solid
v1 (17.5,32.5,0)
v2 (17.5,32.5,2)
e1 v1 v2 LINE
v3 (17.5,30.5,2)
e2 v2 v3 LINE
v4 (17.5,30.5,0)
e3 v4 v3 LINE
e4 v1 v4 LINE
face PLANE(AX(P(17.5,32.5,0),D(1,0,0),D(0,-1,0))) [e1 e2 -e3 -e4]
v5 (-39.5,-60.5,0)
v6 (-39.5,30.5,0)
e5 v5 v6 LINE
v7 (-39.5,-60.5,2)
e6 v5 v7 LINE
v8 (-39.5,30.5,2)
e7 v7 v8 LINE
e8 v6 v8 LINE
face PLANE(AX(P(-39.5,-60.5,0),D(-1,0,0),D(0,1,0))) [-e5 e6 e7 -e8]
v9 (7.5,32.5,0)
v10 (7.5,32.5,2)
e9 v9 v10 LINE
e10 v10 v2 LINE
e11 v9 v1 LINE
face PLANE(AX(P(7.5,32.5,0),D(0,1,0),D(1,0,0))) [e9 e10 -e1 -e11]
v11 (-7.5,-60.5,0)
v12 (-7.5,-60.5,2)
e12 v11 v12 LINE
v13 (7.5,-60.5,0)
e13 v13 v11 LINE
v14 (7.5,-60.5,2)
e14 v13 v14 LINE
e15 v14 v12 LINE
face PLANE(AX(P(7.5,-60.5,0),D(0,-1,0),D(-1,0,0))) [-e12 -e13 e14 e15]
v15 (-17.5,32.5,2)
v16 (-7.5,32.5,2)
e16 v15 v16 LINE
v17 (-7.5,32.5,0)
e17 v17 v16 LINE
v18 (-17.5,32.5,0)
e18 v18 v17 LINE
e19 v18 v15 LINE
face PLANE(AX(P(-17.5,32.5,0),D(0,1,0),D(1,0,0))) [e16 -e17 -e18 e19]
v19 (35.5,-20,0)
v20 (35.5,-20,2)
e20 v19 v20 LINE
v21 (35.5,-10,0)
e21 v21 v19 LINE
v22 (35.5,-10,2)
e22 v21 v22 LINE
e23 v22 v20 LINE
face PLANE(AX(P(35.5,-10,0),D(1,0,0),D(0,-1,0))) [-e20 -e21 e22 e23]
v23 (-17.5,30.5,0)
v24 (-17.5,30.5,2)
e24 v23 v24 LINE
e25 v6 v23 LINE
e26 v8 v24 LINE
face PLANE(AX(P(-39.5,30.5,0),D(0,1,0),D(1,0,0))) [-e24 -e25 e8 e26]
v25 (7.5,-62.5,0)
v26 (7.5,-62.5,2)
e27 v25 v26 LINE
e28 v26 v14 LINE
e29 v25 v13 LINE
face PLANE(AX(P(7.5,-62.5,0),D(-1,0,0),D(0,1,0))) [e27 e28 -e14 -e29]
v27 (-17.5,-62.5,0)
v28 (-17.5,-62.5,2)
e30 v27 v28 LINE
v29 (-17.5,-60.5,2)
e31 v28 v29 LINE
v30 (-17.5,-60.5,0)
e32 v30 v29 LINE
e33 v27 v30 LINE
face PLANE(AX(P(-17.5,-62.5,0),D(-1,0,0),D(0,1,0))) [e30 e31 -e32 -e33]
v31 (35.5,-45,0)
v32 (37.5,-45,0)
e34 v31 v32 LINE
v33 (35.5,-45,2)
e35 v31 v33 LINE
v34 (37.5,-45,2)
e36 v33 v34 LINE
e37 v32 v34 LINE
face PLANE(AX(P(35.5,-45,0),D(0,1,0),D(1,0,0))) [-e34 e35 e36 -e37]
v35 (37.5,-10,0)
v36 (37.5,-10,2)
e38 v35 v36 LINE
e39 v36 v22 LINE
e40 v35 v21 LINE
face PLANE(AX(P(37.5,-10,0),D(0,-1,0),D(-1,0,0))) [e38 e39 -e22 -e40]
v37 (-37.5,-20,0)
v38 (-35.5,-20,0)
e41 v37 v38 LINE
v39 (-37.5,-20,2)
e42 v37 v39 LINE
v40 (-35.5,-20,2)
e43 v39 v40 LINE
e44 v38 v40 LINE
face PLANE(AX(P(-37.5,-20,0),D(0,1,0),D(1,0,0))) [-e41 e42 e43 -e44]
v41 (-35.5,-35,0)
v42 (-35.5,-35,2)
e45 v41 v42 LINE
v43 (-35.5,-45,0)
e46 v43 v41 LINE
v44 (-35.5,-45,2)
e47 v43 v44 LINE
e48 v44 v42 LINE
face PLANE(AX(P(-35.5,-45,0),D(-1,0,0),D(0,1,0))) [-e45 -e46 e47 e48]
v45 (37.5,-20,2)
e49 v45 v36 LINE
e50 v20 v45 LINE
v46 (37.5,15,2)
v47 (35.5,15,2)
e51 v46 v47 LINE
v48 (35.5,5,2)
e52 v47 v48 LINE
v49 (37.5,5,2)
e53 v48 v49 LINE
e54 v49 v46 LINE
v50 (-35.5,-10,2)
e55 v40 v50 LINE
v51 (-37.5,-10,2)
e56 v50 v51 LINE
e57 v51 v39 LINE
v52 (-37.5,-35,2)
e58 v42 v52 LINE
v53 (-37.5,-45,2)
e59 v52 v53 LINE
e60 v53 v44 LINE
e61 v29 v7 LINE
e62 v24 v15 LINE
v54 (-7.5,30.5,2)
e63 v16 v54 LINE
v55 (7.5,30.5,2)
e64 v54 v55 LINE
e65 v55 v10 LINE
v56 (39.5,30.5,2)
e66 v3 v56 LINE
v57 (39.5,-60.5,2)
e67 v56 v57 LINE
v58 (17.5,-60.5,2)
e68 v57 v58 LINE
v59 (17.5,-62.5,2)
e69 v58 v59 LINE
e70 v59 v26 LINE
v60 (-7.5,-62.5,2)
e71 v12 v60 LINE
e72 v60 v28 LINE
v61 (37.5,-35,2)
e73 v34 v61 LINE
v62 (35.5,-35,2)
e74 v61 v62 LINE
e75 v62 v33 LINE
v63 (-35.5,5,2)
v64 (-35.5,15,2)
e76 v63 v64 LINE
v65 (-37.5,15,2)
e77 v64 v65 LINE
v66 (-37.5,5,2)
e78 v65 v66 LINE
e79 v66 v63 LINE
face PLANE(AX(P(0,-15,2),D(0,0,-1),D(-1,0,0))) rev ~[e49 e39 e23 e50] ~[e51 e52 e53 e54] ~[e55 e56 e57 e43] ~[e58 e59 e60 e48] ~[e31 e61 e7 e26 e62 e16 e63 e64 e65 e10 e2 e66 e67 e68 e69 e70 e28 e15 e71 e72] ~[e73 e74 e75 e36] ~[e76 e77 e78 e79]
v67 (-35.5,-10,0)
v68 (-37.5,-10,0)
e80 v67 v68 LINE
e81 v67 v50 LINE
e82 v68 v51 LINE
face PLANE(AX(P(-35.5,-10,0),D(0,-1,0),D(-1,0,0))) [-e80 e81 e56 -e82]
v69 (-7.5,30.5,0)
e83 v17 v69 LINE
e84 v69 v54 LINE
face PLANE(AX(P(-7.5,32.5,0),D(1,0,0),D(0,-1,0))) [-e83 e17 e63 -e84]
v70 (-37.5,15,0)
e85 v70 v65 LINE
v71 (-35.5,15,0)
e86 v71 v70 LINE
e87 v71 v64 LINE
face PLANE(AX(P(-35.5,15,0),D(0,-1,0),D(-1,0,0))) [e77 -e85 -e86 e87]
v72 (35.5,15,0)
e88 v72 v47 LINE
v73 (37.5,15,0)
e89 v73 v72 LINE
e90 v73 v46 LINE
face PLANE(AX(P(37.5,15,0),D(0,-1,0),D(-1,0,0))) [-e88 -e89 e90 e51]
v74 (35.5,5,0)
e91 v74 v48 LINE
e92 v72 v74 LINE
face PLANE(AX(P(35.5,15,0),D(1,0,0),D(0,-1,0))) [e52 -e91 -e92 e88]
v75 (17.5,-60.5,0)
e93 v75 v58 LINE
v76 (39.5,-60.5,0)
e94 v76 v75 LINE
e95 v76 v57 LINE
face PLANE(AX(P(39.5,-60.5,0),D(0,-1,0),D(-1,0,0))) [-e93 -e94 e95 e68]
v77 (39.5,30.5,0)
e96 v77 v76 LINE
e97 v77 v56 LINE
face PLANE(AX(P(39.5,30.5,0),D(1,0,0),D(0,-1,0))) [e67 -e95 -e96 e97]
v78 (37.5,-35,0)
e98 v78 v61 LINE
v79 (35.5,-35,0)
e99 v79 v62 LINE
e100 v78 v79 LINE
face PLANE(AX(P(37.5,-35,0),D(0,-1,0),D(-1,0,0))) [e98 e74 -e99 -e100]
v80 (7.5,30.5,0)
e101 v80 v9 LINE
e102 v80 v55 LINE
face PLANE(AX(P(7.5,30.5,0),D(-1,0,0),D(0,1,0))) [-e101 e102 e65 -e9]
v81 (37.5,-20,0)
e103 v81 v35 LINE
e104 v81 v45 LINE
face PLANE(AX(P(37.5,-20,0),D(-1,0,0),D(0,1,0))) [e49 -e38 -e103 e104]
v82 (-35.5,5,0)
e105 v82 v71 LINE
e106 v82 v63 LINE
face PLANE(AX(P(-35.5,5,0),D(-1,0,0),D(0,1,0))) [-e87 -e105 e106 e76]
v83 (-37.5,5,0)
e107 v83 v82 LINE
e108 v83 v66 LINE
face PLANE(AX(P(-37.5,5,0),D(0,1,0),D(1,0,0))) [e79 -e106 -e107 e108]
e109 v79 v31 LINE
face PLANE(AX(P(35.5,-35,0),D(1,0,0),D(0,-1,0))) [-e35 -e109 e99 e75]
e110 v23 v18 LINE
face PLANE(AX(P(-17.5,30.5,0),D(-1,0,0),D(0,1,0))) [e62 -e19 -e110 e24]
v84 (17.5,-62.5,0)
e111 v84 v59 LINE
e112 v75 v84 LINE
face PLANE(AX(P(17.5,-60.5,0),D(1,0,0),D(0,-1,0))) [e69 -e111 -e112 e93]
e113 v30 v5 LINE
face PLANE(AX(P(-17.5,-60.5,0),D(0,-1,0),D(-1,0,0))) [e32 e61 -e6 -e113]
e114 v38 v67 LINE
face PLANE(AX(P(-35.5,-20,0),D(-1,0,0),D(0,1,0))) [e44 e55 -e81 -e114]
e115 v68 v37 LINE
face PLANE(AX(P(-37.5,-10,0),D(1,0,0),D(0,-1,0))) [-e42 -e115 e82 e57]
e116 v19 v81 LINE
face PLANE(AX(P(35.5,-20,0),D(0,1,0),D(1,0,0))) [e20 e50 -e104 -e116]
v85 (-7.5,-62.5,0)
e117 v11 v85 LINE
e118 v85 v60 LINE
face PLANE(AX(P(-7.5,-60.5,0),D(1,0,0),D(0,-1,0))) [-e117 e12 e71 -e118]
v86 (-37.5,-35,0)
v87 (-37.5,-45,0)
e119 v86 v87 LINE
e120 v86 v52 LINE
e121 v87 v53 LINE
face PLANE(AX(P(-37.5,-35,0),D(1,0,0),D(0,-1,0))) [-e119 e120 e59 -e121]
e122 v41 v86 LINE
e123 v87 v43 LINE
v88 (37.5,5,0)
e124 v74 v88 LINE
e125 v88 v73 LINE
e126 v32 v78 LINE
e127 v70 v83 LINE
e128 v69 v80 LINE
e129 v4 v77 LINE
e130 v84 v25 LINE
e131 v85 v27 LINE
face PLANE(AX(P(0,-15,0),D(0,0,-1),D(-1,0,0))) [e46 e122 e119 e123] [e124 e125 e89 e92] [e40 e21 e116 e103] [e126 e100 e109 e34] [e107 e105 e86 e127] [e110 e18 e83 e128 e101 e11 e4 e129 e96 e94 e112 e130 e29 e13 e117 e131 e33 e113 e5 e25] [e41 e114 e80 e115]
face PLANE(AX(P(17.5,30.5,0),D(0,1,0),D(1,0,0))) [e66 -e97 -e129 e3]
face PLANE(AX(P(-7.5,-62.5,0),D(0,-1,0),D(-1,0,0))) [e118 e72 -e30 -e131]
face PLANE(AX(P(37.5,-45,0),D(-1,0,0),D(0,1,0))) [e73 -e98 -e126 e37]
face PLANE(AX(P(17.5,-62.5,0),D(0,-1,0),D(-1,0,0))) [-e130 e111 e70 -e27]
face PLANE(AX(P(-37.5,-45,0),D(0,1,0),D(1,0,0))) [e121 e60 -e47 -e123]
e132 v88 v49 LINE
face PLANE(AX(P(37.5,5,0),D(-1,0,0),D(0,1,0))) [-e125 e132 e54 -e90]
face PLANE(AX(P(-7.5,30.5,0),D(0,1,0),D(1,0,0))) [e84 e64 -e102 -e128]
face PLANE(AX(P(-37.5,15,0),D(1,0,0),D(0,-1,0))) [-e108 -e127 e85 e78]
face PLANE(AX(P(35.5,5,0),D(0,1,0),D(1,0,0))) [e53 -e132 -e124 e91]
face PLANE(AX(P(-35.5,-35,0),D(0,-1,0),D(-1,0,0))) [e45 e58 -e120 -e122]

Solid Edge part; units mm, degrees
sketch "Sketch1" plane through (0, 0, 0) normal (0, 0, 1) x (1, 0, 0)
  line L0 (7.5, -60.5) -> (-7.5, -60.5)
  line L1 (-7.5, -60.5) -> (-7.5, -62.5)
  line L2 (-7.5, -62.5) -> (-17.5, -62.5)
  line L3 (-17.5, -62.5) -> (-17.5, -60.5)
  line L4 (-17.5, -60.5) -> (-39.5, -60.5)
  line L5 (-39.5, -60.5) -> (-39.5, 30.5)
  line L6 (-39.5, 30.5) -> (-17.5, 30.5)
  line L7 (-17.5, 30.5) -> (-17.5, 32.5)
  line L8 (-17.5, 32.5) -> (-7.5, 32.5)
  line L9 (-7.5, 32.5) -> (-7.5, 30.5)
  line L10 (-7.5, 30.5) -> (7.5, 30.5)
  line L11 (7.5, 30.5) -> (7.5, 32.5)
  line L12 (7.5, 32.5) -> (17.5, 32.5)
  line L13 (17.5, 32.5) -> (17.5, 30.5)
  line L14 (17.5, 30.5) -> (39.5, 30.5)
  line L15 (39.5, 30.5) -> (39.5, -60.5)
  line L16 (39.5, -60.5) -> (17.5, -60.5)
  line L17 (17.5, -60.5) -> (17.5, -62.5)
  line L18 (17.5, -62.5) -> (7.5, -62.5)
  line L19 (7.5, -62.5) -> (7.5, -60.5)
  line L20 (37.5, 5) -> (37.5, 15)
  line L21 (35.5, 5) -> (37.5, 5)
  line L22 (35.5, 15) -> (35.5, 5)
  line L23 (37.5, 15) -> (35.5, 15)
  line L24 (-35.5, -45) -> (-35.5, -35)
  line L25 (-37.5, -45) -> (-35.5, -45)
  line L26 (-37.5, -35) -> (-37.5, -45)
  line L27 (-35.5, -35) -> (-37.5, -35)
  line L28 (-37.5, 15) -> (-37.5, 5)
  line L29 (-35.5, 15) -> (-37.5, 15)
  line L30 (-35.5, 5) -> (-35.5, 15)
  line L31 (-37.5, 5) -> (-35.5, 5)
  line L32 (35.5, -45) -> (37.5, -45)
  line L33 (35.5, -35) -> (35.5, -45)
  line L34 (37.5, -35) -> (35.5, -35)
  line L35 (37.5, -45) -> (37.5, -35)
  line L36 (37.5, -20) -> (37.5, -10)
  line L37 (35.5, -20) -> (37.5, -20)
  line L38 (35.5, -10) -> (35.5, -20)
  line L39 (37.5, -10) -> (35.5, -10)
  line L40 (-37.5, -20) -> (-35.5, -20)
  line L41 (-37.5, -10) -> (-37.5, -20)
  line L42 (-35.5, -10) -> (-37.5, -10)
  line L43 (-35.5, -20) -> (-35.5, -10)
extrude "Protrusion1" add sketch "Sketch1" along normal blind 2
properties material "Acrylic, high impact grade"
